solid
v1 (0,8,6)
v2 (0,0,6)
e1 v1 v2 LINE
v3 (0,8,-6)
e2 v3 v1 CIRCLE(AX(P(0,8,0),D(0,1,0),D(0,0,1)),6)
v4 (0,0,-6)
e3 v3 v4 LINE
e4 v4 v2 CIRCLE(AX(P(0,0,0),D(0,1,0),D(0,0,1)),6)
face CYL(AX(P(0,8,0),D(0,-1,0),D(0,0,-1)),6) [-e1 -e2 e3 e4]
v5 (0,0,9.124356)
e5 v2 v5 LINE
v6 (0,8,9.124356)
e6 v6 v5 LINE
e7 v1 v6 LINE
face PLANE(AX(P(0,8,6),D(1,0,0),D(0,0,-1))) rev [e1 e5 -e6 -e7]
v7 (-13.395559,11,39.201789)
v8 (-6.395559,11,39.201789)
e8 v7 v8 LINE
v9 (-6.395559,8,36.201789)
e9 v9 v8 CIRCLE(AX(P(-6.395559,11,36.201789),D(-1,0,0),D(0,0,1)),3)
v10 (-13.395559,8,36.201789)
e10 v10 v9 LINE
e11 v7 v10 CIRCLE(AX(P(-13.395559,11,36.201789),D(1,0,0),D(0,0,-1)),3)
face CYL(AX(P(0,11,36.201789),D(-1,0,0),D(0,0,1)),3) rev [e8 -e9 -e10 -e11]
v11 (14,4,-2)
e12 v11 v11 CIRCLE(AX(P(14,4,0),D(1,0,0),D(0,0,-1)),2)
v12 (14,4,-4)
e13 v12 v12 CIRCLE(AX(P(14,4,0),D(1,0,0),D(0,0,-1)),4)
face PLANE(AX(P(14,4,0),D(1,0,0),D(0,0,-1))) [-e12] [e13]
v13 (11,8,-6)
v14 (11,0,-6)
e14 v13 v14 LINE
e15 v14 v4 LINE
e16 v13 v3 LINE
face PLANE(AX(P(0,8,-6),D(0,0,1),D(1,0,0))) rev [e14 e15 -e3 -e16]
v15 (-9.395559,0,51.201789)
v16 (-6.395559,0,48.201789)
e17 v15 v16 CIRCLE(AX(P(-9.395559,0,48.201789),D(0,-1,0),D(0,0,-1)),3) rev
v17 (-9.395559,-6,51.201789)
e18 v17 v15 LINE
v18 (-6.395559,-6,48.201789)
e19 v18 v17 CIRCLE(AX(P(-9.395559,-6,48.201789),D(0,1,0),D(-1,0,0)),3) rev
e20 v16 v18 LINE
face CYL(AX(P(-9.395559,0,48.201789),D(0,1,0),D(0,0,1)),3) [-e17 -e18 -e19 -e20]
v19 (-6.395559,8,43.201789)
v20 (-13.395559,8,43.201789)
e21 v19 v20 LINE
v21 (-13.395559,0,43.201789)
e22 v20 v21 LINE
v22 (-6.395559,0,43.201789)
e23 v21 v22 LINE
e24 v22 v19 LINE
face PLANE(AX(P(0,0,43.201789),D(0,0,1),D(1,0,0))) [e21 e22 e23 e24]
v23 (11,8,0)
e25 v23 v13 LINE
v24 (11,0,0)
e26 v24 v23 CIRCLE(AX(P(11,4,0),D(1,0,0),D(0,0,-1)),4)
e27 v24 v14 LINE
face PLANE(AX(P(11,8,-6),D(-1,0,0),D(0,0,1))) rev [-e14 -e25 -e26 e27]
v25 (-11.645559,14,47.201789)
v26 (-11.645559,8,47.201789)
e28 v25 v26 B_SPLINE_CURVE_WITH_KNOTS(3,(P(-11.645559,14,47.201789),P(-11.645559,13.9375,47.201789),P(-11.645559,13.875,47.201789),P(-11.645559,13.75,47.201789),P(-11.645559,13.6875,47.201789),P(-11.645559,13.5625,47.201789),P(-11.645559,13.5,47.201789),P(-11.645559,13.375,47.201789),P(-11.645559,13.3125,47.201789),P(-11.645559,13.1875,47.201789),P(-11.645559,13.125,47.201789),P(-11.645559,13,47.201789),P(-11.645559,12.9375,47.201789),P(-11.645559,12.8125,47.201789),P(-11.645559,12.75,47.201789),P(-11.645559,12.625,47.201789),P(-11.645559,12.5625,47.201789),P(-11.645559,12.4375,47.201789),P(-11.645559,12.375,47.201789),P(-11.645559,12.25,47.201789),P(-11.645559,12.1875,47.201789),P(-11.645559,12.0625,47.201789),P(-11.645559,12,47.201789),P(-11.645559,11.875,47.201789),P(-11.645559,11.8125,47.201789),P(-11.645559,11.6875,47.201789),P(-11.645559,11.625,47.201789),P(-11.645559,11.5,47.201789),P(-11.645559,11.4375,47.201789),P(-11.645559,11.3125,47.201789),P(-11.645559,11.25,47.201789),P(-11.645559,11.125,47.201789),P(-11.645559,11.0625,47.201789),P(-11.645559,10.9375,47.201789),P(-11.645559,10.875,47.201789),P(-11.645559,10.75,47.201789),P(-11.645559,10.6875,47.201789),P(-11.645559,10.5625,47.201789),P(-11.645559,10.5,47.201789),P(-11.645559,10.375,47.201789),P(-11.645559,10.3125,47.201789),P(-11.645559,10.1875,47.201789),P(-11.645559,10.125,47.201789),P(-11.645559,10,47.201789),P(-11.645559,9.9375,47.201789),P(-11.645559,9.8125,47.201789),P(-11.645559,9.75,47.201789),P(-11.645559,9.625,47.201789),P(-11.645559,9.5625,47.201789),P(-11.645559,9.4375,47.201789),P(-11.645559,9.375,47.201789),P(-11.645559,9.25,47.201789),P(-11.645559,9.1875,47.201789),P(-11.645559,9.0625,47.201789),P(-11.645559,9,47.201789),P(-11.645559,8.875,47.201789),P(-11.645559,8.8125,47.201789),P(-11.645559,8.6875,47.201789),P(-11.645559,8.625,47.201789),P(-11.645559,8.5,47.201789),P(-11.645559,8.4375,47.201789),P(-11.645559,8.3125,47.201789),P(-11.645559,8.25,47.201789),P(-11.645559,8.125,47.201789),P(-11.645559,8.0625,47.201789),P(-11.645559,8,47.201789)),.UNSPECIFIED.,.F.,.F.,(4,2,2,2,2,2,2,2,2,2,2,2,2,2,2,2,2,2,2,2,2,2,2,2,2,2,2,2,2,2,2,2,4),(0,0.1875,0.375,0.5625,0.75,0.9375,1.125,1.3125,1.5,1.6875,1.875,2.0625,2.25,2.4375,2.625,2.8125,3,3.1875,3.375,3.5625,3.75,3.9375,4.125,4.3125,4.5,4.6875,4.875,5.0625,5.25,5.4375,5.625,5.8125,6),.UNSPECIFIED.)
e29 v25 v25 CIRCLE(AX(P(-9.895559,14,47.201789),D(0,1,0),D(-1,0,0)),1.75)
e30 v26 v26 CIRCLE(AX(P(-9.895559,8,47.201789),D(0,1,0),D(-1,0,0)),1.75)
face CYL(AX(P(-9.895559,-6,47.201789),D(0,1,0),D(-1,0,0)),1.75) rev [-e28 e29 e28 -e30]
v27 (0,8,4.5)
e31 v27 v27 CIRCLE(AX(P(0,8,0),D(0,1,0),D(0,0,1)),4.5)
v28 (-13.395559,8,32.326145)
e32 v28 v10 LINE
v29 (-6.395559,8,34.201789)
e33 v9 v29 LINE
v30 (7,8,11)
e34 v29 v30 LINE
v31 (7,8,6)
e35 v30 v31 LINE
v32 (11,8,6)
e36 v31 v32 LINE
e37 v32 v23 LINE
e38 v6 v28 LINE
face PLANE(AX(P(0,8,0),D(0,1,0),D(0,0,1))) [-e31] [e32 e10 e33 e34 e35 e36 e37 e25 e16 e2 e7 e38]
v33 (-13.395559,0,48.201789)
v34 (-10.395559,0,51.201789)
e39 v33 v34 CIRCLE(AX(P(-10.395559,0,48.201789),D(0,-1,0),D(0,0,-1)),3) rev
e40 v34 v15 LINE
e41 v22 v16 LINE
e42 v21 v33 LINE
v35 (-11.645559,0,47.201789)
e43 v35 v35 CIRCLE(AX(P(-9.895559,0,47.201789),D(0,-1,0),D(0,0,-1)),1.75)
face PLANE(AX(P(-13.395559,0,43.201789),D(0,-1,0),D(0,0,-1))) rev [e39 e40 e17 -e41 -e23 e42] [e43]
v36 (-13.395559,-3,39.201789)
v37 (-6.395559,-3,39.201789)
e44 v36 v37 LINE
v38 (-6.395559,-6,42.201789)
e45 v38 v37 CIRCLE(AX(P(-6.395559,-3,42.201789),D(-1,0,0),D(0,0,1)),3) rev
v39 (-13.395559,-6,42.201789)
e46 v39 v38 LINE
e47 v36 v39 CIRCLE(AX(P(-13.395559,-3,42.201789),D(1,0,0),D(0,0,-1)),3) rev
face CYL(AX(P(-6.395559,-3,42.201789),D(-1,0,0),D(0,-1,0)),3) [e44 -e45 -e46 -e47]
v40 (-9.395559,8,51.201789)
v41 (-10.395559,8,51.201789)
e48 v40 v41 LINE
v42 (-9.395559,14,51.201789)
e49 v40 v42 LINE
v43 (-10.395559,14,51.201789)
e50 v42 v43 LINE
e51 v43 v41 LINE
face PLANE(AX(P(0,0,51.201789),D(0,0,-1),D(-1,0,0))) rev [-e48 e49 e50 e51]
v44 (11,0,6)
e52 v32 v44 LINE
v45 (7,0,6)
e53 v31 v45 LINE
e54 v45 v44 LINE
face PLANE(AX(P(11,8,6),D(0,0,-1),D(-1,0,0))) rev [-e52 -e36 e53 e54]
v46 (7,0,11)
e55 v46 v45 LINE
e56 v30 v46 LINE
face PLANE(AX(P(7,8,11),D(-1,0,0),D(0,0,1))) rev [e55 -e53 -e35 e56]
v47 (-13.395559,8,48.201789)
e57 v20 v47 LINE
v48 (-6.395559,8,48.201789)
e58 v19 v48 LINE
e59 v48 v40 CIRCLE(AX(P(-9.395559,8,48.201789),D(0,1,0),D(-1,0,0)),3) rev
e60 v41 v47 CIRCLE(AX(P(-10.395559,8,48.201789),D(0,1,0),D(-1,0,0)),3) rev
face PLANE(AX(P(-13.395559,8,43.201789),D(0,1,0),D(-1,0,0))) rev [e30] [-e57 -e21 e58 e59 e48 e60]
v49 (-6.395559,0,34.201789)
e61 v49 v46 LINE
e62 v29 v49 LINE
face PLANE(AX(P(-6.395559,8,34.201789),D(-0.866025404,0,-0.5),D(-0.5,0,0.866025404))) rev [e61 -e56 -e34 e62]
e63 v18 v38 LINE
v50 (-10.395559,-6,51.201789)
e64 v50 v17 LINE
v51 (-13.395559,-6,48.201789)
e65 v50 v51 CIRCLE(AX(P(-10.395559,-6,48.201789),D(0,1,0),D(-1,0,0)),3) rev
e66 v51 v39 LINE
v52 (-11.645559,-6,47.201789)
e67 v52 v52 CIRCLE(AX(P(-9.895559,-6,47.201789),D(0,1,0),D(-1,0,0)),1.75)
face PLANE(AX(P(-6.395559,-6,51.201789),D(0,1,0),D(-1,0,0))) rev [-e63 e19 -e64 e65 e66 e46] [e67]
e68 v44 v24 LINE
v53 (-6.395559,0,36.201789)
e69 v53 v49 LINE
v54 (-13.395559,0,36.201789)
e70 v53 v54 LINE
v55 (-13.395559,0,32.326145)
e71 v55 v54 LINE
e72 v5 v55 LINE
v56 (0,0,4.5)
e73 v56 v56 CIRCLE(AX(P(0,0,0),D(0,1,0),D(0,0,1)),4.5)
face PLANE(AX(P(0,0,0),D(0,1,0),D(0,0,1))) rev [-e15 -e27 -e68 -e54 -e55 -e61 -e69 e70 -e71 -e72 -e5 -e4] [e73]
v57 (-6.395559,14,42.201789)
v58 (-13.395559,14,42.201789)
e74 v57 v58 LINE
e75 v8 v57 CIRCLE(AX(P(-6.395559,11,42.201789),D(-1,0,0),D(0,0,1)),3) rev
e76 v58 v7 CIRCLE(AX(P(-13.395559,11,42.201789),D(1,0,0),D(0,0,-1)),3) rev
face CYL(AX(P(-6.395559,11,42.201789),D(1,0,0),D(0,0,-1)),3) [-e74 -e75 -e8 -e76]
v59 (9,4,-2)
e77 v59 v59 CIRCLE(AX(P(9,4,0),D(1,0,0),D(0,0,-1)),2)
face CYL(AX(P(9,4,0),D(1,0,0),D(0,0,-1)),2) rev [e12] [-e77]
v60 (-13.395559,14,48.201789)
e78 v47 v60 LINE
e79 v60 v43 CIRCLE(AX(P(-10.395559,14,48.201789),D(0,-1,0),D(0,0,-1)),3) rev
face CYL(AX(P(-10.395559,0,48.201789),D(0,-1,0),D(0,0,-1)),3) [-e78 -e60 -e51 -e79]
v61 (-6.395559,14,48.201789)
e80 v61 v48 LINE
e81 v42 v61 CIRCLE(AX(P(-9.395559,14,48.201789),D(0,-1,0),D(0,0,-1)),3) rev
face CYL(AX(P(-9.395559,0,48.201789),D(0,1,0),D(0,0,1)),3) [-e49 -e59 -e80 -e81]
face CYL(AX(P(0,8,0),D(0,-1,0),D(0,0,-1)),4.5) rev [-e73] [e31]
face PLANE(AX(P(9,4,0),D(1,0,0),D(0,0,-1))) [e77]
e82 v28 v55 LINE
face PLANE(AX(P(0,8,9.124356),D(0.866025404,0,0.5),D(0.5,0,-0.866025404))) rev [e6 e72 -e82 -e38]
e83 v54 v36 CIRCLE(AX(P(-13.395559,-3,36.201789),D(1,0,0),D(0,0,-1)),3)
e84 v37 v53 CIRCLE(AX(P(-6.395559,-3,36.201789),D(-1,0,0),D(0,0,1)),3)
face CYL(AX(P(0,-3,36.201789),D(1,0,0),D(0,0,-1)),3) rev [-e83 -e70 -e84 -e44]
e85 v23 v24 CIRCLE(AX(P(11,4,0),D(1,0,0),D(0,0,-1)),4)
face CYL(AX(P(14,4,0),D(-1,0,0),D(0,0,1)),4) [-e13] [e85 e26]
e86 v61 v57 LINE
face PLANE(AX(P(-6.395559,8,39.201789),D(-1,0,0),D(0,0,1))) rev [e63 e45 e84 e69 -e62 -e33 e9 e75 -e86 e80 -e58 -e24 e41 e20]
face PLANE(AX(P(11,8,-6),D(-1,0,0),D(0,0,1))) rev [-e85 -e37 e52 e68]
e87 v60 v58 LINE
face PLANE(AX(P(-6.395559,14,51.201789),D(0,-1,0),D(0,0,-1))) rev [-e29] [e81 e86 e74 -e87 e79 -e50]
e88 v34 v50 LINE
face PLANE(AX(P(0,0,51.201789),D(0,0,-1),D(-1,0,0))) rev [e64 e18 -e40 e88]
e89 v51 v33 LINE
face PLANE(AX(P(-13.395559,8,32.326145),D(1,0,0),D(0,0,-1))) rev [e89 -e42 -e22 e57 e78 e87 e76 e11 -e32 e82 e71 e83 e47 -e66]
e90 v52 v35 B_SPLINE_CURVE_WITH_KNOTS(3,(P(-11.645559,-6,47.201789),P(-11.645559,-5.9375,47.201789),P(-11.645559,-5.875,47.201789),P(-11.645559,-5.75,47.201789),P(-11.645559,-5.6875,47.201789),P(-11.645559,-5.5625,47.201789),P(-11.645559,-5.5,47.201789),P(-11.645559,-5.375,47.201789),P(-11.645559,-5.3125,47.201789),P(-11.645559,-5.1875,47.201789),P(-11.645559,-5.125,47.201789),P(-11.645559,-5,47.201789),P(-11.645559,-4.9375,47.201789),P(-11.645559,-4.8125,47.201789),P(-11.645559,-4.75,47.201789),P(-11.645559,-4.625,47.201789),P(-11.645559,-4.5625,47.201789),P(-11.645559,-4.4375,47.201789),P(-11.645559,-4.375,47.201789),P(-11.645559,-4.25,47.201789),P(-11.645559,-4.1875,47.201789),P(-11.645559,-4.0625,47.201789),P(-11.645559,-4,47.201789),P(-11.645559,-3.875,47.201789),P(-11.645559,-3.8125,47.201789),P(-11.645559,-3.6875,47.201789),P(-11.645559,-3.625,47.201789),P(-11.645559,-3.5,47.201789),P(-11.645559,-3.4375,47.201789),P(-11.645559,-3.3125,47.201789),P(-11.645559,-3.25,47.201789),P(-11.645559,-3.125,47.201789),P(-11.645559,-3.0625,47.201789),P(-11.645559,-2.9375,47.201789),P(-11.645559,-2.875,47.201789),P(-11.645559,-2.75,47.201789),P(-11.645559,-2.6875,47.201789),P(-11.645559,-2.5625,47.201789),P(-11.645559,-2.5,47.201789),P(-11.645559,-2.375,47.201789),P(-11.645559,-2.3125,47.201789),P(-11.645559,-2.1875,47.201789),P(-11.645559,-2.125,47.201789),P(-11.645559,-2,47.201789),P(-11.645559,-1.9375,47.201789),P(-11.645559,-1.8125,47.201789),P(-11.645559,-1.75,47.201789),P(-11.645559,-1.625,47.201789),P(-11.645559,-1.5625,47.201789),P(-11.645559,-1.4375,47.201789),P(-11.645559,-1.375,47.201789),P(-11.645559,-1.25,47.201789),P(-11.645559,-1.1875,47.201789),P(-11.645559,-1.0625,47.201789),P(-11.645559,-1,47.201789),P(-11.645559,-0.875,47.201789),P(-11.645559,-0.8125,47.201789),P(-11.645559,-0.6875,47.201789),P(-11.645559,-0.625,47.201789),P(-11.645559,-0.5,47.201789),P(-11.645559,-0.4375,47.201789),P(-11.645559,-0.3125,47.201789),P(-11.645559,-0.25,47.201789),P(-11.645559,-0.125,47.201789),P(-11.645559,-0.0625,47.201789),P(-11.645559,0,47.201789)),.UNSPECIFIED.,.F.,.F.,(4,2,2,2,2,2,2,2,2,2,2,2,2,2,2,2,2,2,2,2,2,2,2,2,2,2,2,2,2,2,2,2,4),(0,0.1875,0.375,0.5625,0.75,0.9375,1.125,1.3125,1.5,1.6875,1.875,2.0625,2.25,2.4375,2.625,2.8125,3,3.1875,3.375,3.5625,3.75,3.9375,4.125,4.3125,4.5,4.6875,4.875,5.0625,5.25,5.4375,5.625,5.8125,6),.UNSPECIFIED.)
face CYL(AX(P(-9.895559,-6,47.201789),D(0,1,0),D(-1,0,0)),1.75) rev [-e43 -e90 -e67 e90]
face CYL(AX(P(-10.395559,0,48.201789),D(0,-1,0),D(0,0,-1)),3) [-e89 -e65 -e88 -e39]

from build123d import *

# Parameters (mm, degrees)
SKETCH1_R           = 4.5
BOSS_EXTRUDE1_DEPTH = 8
SKETCH2_R           = 4
BOSS_EXTRUDE2_DEPTH = 3
SKETCH3_R           = 2
CUT_EXTRUDE1_DEPTH  = 5
BOSS_EXTRUDE3_DEPTH = 8
SKETCH5_W           = 7
SKETCH5_H           = 20
BOSS_EXTRUDE4_DEPTH = 12
FILLET1_START       = -13.395559342
FILLET1_DEPTH       = 7
FILLET1_2_DEPTH     = 7
SKETCH6_W           = 7
SKETCH6_H           = 8
CUT_EXTRUDE2_DEPTH  = 8
FILLET2_R           = 3
SKETCH7_R           = 1.75
CUT_EXTRUDE3_DEPTH  = 57.724097483


with BuildPart() as part:
    # Sketch1 → Boss-Extrude1 (new body)
    with BuildSketch(Plane(origin=(0, 0, 0), x_dir=(1, 0, 0), z_dir=(0, 1, 0))):
        with BuildLine():
            Line((0, 6), (11, 6))
            Line((11, 6), (11, -6))
            Line((11, -6), (0, -6))
            ThreePointArc((0, -6), (-6, 0), (0, 6))
        make_face()
        with Locations(Location((0, 0, 0), (0, 0, 270))):
            Circle(SKETCH1_R, mode=Mode.SUBTRACT)
    extrude(amount=BOSS_EXTRUDE1_DEPTH)

    # Sketch2 → Boss-Extrude2 (add)
    with BuildSketch(Plane(origin=(11, 0, 0), x_dir=(0, 0, -1), z_dir=(1, 0, 0))):
        with Locations(Location((0, 4, 0), (0, 0, 270))):
            Circle(SKETCH2_R)
    extrude(amount=BOSS_EXTRUDE2_DEPTH)

    # Sketch3 → Cut-Extrude1 (cut)
    with BuildSketch(Plane(origin=(14, 0, 0), x_dir=(0, 0, -1), z_dir=(1, 0, 0))):
        with Locations((0, 4)):
            Circle(SKETCH3_R)
    extrude(amount=-CUT_EXTRUDE1_DEPTH, mode=Mode.SUBTRACT)

    # Sketch4 → Boss-Extrude3 (add)
    with BuildSketch(Plane(origin=(0, 0, 0), x_dir=(1, 0, 0), z_dir=(0, 1, 0))):
        Polygon((0, -6), (0, -9.124355653), (-13.395559342, -32.326145029), (-13.395559342, -39.201789376), (-6.395559342, -39.201789376), (-6.395559342, -34.201789376), (7, -11), (7, -6), align=None)
    extrude(amount=BOSS_EXTRUDE3_DEPTH)

    # Sketch5 → Boss-Extrude4 (add)
    with BuildSketch(Plane.XY.offset(39.201789376)):
        with Locations((-9.895559342, 4)):
            Rectangle(SKETCH5_W, SKETCH5_H)
    extrude(amount=BOSS_EXTRUDE4_DEPTH)

    # Fillet1: read off the stored shape, not the designer's step
    # Fillet1 outline → Fillet1 (cut)
    with BuildSketch(Plane.YZ.offset(FILLET1_START)):
        with BuildLine():
            Line((-6, 39.201789376), (-3, 39.201789376))
            ThreePointArc((-3, 39.201789376), (-5.121320344, 40.080469032), (-6, 42.201789376))
            Line((-6, 42.201789376), (-6, 39.201789376))
        make_face()
        with BuildLine():
            ThreePointArc((14, 42.201789376), (13.121320344, 40.080469032), (11, 39.201789376))
            Line((11, 39.201789376), (14, 39.201789376))
            Line((14, 39.201789376), (14, 42.201789376))
        make_face()
    extrude(amount=FILLET1_DEPTH, mode=Mode.SUBTRACT)

    # Fillet1 2 outline → Fillet1 2 (add)
    with BuildSketch(Plane.YZ.offset(FILLET1_START)):
        with BuildLine():
            ThreePointArc((-3, 39.201789376), (-0.878679657, 38.32310972), (0, 36.201789376))
            Line((0, 36.201789376), (0, 39.201789376))
            Line((0, 39.201789376), (-3, 39.201789376))
        make_face()
        with BuildLine():
            ThreePointArc((8, 36.201789376), (8.878679656, 38.32310972), (11, 39.201789376))
            Line((11, 39.201789376), (8, 39.201789376))
            Line((8, 39.201789376), (8, 36.201789376))
        make_face()
    extrude(amount=FILLET1_2_DEPTH)

    # Sketch6 → Cut-Extrude2 (cut)
    with BuildSketch(Plane.XY.offset(51.201789376)):
        with Locations((-9.895559342, 4)):
            Rectangle(SKETCH6_W, SKETCH6_H)
    extrude(amount=-CUT_EXTRUDE2_DEPTH, mode=Mode.SUBTRACT)

    # Fillet2
    fillet2_edges = [part.edges().sort_by_distance(p)[0] for p in [
        (-6.395559342, -3, 51.201789376),
        (-13.395559342, 11, 51.201789376),
        (-6.395559342, 11, 51.201789376),
        (-13.395559342, -3, 51.201789376),
    ]]
    fillet(fillet2_edges, radius=FILLET2_R)

    # Sketch7 → Cut-Extrude3 (cut, through all)
    with BuildSketch(Plane(origin=(0, 14, 0), x_dir=(1, 0, 0), z_dir=(0, 1, 0))):
        with Locations(Location((-9.895559342, -47.201789376, 0), (0, 0, 180))):
            Circle(SKETCH7_R)
    extrude(amount=-CUT_EXTRUDE3_DEPTH, mode=Mode.SUBTRACT)


solid = part.part
